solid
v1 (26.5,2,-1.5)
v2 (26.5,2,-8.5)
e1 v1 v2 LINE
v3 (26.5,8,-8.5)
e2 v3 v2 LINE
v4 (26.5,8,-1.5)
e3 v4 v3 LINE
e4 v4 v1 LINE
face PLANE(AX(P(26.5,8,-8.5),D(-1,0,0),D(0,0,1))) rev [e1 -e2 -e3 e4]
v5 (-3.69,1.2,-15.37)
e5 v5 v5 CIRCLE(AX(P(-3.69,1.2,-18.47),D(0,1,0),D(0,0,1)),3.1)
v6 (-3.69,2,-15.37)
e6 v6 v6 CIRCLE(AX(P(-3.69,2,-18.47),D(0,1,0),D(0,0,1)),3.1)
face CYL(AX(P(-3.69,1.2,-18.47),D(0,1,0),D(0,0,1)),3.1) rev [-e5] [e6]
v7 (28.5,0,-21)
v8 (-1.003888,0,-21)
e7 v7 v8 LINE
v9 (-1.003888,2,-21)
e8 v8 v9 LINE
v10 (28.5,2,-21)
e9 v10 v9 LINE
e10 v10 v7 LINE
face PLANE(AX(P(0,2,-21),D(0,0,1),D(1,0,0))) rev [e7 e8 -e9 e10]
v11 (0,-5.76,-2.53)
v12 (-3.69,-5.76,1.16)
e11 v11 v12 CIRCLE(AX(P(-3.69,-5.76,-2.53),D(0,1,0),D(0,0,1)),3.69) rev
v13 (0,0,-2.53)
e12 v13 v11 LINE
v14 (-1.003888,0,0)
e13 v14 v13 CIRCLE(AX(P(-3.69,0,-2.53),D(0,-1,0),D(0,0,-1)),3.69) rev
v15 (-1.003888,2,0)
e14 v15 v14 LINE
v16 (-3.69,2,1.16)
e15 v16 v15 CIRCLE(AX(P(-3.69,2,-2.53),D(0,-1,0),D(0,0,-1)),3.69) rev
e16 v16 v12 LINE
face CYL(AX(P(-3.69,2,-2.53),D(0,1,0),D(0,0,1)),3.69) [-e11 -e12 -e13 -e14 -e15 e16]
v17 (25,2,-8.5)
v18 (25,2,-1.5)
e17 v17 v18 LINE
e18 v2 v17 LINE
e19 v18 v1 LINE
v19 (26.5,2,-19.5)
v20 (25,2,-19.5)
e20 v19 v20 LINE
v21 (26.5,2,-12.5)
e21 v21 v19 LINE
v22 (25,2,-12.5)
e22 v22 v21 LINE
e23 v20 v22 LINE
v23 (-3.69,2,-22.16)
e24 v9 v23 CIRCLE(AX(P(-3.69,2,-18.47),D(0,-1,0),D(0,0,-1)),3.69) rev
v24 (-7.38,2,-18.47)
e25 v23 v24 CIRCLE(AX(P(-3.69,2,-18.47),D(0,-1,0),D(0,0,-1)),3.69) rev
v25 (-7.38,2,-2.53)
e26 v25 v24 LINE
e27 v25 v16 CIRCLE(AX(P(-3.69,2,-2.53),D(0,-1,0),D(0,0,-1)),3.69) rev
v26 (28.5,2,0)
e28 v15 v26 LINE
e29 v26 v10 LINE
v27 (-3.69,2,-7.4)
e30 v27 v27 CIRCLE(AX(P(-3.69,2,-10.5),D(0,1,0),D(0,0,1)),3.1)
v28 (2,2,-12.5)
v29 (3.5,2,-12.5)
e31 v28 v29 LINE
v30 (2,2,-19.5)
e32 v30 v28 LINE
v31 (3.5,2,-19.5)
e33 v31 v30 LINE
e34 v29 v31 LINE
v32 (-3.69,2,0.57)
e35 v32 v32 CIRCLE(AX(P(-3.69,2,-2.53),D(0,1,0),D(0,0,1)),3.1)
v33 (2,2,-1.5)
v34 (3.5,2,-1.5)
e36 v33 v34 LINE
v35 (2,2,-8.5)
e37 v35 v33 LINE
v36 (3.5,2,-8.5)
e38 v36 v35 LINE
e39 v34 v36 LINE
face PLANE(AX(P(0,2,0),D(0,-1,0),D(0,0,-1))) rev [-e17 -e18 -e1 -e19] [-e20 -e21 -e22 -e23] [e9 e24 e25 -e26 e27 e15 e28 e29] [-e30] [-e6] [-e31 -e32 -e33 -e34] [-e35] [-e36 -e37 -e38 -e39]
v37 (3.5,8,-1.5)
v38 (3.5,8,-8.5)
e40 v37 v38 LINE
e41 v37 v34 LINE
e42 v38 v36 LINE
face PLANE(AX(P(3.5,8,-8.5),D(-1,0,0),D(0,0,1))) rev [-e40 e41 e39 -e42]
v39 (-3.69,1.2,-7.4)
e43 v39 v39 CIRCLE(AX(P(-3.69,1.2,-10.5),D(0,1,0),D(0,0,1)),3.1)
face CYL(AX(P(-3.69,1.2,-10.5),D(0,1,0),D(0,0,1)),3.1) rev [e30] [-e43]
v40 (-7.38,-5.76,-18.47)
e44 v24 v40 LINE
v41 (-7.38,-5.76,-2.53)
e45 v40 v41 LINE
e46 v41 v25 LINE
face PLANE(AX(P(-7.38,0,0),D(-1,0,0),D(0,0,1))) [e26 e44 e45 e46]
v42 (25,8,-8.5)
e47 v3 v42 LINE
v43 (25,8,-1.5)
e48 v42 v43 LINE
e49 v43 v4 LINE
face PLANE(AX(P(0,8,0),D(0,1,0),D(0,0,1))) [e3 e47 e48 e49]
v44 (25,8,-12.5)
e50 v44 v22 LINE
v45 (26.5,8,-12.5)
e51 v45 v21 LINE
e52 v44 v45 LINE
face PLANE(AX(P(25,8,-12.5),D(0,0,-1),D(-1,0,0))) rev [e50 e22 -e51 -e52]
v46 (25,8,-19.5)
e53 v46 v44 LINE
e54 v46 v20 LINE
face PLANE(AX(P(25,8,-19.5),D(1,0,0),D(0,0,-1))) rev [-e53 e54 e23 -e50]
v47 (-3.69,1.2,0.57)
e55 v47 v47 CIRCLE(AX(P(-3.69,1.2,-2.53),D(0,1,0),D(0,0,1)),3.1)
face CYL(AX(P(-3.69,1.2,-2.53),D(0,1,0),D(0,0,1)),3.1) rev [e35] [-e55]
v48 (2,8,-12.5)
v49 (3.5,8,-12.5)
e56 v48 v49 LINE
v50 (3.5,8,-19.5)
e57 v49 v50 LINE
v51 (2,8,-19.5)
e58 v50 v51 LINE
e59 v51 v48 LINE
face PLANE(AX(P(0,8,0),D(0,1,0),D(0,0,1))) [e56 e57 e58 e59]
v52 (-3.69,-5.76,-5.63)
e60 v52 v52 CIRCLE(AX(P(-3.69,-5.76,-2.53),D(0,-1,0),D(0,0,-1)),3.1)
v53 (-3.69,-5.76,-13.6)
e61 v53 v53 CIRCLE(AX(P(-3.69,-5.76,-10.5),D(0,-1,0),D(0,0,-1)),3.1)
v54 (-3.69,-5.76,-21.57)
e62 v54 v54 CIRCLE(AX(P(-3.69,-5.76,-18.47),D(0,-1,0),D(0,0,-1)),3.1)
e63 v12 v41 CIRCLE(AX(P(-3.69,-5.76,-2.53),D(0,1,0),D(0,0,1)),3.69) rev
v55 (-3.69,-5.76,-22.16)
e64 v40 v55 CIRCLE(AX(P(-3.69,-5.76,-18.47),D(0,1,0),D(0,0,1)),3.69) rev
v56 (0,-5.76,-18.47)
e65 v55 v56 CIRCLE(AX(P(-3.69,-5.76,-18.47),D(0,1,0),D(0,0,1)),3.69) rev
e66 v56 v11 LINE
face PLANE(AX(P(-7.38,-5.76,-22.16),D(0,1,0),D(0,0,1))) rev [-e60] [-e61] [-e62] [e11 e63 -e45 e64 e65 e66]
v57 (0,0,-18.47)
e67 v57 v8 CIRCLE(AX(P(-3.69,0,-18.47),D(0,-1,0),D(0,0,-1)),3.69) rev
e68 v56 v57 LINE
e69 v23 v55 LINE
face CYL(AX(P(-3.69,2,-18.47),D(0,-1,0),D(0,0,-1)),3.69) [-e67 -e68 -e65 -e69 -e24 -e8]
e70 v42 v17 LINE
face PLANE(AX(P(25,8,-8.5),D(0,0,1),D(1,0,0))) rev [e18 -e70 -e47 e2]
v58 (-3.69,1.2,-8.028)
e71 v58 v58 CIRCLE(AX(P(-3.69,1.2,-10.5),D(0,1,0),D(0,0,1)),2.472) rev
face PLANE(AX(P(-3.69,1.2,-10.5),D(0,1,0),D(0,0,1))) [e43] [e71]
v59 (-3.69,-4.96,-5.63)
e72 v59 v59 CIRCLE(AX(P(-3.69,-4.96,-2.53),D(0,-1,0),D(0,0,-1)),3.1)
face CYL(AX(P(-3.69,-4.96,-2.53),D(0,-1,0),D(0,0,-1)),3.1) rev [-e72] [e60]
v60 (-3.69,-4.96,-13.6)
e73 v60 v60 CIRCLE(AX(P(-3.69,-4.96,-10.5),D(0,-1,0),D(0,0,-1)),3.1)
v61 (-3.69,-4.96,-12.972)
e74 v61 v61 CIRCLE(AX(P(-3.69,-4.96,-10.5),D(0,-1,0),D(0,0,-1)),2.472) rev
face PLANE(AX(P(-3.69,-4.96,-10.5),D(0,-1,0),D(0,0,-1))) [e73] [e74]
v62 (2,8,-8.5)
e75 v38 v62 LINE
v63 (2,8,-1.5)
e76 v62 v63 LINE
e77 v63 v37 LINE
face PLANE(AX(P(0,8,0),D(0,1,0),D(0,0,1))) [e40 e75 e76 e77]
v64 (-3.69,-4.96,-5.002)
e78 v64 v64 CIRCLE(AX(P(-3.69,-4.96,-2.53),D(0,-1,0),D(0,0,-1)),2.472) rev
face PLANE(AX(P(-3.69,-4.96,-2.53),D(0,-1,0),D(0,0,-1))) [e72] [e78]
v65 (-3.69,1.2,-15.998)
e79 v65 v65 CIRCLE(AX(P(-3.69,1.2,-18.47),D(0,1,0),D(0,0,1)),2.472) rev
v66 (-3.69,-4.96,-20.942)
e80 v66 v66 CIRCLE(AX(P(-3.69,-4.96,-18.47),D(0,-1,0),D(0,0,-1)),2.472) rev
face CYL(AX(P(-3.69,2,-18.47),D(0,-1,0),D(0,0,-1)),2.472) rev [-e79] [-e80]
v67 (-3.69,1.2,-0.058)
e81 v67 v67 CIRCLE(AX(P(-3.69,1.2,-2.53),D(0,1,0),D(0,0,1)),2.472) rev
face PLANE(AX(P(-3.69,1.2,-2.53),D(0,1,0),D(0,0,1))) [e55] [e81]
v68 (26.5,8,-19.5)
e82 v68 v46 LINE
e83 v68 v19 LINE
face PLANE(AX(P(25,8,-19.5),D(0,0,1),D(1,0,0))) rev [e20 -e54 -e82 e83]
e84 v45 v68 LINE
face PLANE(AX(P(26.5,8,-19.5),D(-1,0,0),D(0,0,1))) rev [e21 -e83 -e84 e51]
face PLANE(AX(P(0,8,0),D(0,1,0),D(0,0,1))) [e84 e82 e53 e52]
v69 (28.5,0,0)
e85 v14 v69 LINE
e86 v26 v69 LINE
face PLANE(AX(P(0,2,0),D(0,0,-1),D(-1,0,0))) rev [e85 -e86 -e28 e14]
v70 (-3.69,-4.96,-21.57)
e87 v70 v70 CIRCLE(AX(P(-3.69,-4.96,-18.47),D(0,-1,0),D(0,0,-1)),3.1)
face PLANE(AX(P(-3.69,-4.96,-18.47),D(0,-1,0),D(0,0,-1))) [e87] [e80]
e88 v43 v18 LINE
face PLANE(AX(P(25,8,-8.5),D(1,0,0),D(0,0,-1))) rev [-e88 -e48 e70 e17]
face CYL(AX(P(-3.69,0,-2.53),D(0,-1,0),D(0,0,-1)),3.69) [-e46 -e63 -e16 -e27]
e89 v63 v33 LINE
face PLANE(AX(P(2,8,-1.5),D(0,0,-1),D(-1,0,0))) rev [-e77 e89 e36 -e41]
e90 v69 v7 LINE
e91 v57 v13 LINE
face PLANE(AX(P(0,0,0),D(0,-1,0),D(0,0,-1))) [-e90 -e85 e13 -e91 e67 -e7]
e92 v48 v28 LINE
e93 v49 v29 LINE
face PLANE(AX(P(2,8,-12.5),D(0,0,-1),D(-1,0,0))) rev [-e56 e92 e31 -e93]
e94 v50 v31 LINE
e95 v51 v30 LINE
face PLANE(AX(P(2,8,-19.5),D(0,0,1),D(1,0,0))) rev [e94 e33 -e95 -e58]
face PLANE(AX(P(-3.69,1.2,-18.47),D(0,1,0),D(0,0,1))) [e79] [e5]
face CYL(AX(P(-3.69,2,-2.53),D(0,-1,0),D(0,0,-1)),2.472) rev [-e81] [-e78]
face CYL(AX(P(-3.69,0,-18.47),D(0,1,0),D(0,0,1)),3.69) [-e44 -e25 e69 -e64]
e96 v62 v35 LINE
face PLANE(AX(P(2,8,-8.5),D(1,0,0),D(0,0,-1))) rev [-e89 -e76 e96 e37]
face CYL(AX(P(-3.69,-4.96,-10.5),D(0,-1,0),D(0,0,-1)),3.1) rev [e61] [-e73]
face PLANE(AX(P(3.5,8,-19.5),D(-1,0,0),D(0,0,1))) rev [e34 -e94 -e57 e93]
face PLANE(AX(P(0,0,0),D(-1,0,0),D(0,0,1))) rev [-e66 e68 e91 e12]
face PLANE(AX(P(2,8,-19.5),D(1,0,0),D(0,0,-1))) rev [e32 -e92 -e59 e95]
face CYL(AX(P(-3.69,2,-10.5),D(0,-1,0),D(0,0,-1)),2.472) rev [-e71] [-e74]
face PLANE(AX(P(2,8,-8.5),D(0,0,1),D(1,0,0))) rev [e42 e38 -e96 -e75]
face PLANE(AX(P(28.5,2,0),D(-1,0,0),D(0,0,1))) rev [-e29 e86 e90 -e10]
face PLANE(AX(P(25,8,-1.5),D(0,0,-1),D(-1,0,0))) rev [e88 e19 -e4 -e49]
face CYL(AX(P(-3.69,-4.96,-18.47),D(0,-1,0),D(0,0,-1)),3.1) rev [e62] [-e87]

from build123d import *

# Parameters (mm, degrees)
SKETCH1_W           = 28.5
SKETCH1_H           = 21
BOSS_EXTRUDE1_DEPTH = 2
SKETCH2_W           = 1.5
SKETCH2_H           = 7
BOSS_EXTRUDE2_DEPTH = 6
SKETCH3_W           = 23.32
SKETCH3_H           = 7.76
BOSS_EXTRUDE3_DEPTH = 7.38
SKETCH4_R           = 2.472
CUT_EXTRUDE1_DEPTH  = 7.76
SKETCH5_R           = 3.1
CUT_EXTRUDE2_DEPTH  = 0.8
CUT_EXTRUDE3_START  = -0.8
SKETCH6_R           = 3.1
CUT_EXTRUDE3_DEPTH  = 0.8
FILLET1_R           = 3.69


with BuildPart() as part:
    # Sketch1 → Boss-Extrude1 (new body)
    with BuildSketch(Plane(origin=(0, 0, 0), x_dir=(1, 0, 0), z_dir=(0, 1, 0))):
        with Locations((14.25, 10.5)):
            Rectangle(SKETCH1_W, SKETCH1_H)
    extrude(amount=BOSS_EXTRUDE1_DEPTH)

    # Sketch2 → Boss-Extrude2 (add)
    with BuildSketch(Plane(origin=(0, 2, 0), x_dir=(1, 0, 0), z_dir=(0, 1, 0))):
        with Locations((2.75, 16)):
            Rectangle(SKETCH2_W, SKETCH2_H)
        with Locations((2.75, 5)):
            Rectangle(SKETCH2_W, SKETCH2_H)
        with Locations((25.75, 16)):
            Rectangle(SKETCH2_W, SKETCH2_H)
        with Locations((25.75, 5)):
            Rectangle(SKETCH2_W, SKETCH2_H)
    extrude(amount=BOSS_EXTRUDE2_DEPTH)

    # Sketch3 → Boss-Extrude3 (add)
    with BuildSketch(Plane.ZY):
        with Locations((-10.5, -1.88)):
            Rectangle(SKETCH3_W, SKETCH3_H)
    extrude(amount=BOSS_EXTRUDE3_DEPTH)

    # Sketch4 → Cut-Extrude1 (cut)
    with BuildSketch(Plane.XZ.offset(5.76)):
        with Locations(Location((-3.69, -2.53, 0), (0, 0, 270))):
            Circle(SKETCH4_R)
        with Locations(Location((-3.69, -10.5, 0), (0, 0, 270))):
            Circle(SKETCH4_R)
        with Locations(Location((-3.69, -18.47, 0), (0, 0, 270))):
            Circle(SKETCH4_R)
    extrude(amount=-CUT_EXTRUDE1_DEPTH, mode=Mode.SUBTRACT)

    # Sketch5 → Cut-Extrude2 (cut)
    with BuildSketch(Plane.XZ.offset(5.76)):
        with Locations(Location((-3.69, -2.53, 0), (0, 0, 270))):
            Circle(SKETCH5_R)
        with Locations(Location((-3.69, -10.5, 0), (0, 0, 270))):
            Circle(SKETCH5_R)
        with Locations(Location((-3.69, -18.47, 0), (0, 0, 270))):
            Circle(SKETCH5_R)
    extrude(amount=-CUT_EXTRUDE2_DEPTH, mode=Mode.SUBTRACT)

    # Sketch6 → Cut-Extrude3 (cut)
    with BuildSketch(Plane(origin=(0, 2, 0), x_dir=(1, 0, 0), z_dir=(0, 1, 0)).offset(CUT_EXTRUDE3_START)):
        with Locations(Location((-3.69, 10.5, 0), (0, 0, 90))):
            Circle(SKETCH6_R)
        with Locations(Location((-3.69, 18.47, 0), (0, 0, 90))):
            Circle(SKETCH6_R)
        with Locations(Location((-3.69, 2.53, 0), (0, 0, 90))):
            Circle(SKETCH6_R)
    extrude(amount=CUT_EXTRUDE3_DEPTH, mode=Mode.SUBTRACT)

    # Fillet1
    fillet1_edges = [part.edges().sort_by_distance(p)[0] for p in [
        (-7.38, -1.88, -22.16),
        (0, -1.88, -22.16),
        (0, -1.88, 1.16),
        (-7.38, -1.88, 1.16),
    ]]
    fillet(fillet1_edges, radius=FILLET1_R - 0.0001)  # a hair under: the kernel refuses the full size


solid = part.part
